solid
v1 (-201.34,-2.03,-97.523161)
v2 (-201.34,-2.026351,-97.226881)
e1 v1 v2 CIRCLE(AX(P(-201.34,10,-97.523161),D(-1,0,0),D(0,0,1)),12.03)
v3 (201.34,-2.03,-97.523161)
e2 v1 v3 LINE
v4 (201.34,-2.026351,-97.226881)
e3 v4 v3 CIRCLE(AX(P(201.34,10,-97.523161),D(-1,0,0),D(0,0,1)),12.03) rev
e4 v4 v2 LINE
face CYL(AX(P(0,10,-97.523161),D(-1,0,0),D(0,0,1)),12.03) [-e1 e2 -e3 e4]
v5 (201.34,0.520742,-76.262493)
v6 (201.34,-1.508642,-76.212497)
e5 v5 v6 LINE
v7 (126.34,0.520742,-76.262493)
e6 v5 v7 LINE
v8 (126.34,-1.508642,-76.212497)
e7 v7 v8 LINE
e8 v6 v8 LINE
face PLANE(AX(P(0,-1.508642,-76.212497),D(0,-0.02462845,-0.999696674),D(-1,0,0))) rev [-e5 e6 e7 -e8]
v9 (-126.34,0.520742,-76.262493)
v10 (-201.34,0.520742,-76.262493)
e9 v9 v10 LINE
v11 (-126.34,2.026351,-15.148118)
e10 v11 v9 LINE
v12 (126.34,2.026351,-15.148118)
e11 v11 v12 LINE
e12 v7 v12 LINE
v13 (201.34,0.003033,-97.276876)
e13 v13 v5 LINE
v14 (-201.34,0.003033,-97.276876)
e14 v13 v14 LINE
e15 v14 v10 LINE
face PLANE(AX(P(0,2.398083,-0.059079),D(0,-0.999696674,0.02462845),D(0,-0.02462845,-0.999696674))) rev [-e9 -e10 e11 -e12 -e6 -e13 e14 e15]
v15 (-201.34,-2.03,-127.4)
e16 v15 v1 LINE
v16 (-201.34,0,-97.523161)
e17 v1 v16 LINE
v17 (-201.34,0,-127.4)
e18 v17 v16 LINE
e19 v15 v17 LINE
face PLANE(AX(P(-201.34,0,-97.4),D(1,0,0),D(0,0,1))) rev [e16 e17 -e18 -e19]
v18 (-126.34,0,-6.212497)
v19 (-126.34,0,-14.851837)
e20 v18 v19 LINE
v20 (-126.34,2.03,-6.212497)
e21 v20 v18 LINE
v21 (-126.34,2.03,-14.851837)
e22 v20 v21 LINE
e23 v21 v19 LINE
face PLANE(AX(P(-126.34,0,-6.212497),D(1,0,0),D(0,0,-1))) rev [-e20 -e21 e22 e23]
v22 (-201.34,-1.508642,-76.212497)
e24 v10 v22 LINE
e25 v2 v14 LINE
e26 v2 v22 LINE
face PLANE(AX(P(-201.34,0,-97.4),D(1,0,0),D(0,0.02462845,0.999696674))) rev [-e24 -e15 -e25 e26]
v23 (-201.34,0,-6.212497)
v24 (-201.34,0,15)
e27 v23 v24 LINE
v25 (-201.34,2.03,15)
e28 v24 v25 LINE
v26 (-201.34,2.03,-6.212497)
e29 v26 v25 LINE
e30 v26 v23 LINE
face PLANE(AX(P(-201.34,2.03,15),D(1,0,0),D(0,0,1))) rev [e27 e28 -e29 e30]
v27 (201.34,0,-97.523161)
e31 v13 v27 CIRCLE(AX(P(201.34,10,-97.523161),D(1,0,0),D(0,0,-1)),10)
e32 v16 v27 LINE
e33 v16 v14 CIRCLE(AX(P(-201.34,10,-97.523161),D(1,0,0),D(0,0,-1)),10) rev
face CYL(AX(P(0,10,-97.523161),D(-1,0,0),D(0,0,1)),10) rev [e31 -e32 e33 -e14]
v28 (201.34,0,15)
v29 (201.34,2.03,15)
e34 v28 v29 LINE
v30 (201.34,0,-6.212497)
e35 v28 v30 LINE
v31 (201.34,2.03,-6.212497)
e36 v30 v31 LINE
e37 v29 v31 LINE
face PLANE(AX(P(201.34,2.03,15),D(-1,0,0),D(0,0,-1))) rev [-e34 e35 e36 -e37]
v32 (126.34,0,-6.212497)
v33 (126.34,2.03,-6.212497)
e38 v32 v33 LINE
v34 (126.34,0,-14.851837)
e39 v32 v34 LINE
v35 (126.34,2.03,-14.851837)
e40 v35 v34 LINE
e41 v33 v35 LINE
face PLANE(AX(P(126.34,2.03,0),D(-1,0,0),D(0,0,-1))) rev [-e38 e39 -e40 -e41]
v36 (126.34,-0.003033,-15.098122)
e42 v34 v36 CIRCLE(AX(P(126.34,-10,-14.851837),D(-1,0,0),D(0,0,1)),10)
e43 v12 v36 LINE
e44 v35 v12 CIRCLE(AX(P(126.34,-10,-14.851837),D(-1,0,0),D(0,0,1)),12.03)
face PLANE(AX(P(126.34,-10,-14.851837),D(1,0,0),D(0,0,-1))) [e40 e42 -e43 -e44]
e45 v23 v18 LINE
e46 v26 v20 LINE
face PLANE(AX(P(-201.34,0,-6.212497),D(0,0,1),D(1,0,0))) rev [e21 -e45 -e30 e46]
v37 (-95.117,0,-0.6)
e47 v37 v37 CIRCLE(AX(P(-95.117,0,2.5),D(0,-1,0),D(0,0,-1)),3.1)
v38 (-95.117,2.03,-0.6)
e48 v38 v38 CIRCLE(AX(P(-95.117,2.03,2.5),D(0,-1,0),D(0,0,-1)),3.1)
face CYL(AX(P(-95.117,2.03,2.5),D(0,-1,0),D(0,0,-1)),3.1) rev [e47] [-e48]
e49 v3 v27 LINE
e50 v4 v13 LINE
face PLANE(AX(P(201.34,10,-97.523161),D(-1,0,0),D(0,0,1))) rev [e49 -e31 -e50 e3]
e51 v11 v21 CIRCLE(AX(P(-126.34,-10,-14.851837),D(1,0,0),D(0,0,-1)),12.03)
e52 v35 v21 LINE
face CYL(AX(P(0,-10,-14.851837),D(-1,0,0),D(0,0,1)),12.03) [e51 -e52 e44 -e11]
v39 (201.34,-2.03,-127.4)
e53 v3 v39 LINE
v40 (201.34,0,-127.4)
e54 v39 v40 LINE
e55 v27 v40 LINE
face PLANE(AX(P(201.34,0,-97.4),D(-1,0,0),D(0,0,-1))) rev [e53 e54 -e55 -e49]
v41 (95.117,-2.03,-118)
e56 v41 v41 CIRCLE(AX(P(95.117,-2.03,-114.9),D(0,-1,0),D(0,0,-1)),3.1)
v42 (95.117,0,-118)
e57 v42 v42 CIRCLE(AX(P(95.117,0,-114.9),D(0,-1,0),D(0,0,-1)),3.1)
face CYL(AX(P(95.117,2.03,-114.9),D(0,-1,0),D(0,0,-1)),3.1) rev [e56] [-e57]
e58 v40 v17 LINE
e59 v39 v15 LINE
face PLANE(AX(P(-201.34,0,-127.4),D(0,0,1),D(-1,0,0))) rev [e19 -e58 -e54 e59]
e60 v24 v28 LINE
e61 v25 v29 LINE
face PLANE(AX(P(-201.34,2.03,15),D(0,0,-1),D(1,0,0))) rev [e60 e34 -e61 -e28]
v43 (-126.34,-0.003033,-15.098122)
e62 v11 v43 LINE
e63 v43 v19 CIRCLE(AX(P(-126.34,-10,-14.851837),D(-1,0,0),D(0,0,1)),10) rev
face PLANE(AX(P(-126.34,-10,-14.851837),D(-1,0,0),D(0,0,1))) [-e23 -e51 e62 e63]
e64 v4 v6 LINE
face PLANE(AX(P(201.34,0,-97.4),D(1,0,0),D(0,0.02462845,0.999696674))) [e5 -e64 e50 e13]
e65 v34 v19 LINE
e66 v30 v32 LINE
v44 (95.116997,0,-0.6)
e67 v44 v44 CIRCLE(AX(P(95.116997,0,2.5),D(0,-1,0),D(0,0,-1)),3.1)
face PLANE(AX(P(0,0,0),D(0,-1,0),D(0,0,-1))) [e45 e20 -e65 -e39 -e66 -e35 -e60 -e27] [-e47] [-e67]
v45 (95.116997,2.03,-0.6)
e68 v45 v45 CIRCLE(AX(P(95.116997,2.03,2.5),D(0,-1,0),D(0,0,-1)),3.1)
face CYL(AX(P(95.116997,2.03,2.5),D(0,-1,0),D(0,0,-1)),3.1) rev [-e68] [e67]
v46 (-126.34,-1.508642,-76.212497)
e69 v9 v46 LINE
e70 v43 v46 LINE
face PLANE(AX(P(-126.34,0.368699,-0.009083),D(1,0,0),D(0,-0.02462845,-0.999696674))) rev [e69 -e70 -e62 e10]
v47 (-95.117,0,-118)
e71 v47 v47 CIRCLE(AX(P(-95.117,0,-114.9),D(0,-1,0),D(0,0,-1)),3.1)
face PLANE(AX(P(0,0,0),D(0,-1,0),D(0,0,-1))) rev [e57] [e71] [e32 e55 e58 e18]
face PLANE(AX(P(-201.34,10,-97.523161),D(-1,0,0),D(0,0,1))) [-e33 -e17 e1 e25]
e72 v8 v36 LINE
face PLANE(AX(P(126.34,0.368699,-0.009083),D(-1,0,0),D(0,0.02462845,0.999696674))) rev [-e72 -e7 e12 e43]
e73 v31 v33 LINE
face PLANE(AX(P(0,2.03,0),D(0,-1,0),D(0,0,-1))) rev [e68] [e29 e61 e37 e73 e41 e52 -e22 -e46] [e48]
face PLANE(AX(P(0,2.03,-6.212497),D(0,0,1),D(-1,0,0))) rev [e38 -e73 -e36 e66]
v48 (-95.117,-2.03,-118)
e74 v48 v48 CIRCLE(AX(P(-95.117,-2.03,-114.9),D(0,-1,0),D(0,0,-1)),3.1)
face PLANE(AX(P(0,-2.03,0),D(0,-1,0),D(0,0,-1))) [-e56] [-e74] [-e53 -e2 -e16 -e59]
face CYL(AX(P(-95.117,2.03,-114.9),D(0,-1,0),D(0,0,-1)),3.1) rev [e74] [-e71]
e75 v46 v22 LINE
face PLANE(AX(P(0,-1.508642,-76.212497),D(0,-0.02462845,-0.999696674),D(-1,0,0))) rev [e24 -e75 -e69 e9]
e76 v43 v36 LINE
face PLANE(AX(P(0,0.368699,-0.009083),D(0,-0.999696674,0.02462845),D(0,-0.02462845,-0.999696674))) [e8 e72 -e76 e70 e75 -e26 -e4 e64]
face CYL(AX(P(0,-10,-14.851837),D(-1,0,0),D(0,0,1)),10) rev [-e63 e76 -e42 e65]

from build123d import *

# Parameters (mm, degrees)
SKETCH1_W               = 402.68
SKETCH1_H               = 30
BOSS_EXTRUDE1_DEPTH     = 2.03
SKETCH2_W               = 402.68
SKETCH2_H               = 30
BOSS_EXTRUDE2_DEPTH     = 2.03
CONVERT_SOLID1_START    = -201.34
CONVERT_SOLID1_DEPTH    = 402.68
CONVERT_SOLID1_2_DEPTH  = 402.68
CUT_EXTRUDE1_START      = -201.34
CUT_EXTRUDE1_DEPTH      = 75
CUT_EXTRUDE1_START_2    = 126.34
CUT_EXTRUDE1_2_DEPTH    = 75
CUT_EXTRUDE2_DEPTH      = 239.296116766
CUT_EXTRUDE2_DEPTH_BACK = 239.296116766
SKETCH8_R               = 3.1
CUT_EXTRUDE3_DEPTH      = 239.27017557
CUT_EXTRUDE3_DEPTH_BACK = 239.27017557
SKETCH10_R              = 3.1


# Read off the part's stored shape, not the designer's step: Convert-Solid1, Cut-Extrude1
with BuildPart() as part:
    # Sketch1 → Boss-Extrude1 (new body)
    with BuildSketch(Plane(origin=(0, 0, 0), x_dir=(1, 0, 0), z_dir=(0, 1, 0))):
        Rectangle(SKETCH1_W, SKETCH1_H)
    extrude(amount=BOSS_EXTRUDE1_DEPTH)


with BuildPart() as body_2:
    # Sketch2 → Boss-Extrude2 (new body)
    with BuildSketch(Plane(origin=(0, 0, 0), x_dir=(1, 0, 0), z_dir=(0, 1, 0))):
        with Locations((0, 112.4)):
            Rectangle(SKETCH2_W, SKETCH2_H)
    extrude(amount=-BOSS_EXTRUDE2_DEPTH)


    add(part.part)  # loft1 joins it to this body
    # loft from a face of the part (loft1)
    loft([body_2.faces().sort_by_distance((0, -1.015, -97.4))[0], body_2.faces().sort_by_distance((0, 1.015, -15))[0]])

    # Convert-Solid1 outline → Convert-Solid1 (cut)
    with BuildSketch(Plane.YZ.offset(CONVERT_SOLID1_START)):
        with BuildLine():
            ThreePointArc((2.03, -14.851837405), (2.029087712, -14.999988764), (2.026350985, -15.148117654))
            Line((2.026350985, -15.148117654), (2.03, -15))
            Line((2.03, -15), (2.03, -14.851837405))
        make_face()
        with BuildLine():
            ThreePointArc((-2.03, -97.523160927), (-2.029683266, -97.435865309), (-2.02873308, -97.348574287))
            Line((-2.02873308, -97.348574287), (-2.03, -97.4))
            Line((-2.03, -97.4), (-2.03, -97.523160927))
        make_face()
    extrude(amount=CONVERT_SOLID1_DEPTH, mode=Mode.SUBTRACT)

    # Convert-Solid1 2 outline → Convert-Solid1 2 (add)
    with BuildSketch(Plane.YZ.offset(CONVERT_SOLID1_START)):
        with BuildLine():
            Line((0, -97.4), (0, -97.523160927))
            ThreePointArc((0, -97.523160927), (0.000758344, -97.40000934), (0.003033263, -97.276876431))
            Line((0.003033263, -97.276876431), (0, -97.4))
        make_face()
        with BuildLine():
            ThreePointArc((0, -14.851837405), (-0.000758344, -14.974988992), (-0.003033263, -15.098121901))
            Line((-0.003033263, -15.098121901), (-2.026350985, -97.226880678))
            ThreePointArc((-2.026350985, -97.226880678), (-2.027695942, -97.28772447), (-2.02873308, -97.348574287))
            Line((-2.02873308, -97.348574287), (0, -15))
            Line((0, -15), (0, -14.851837405))
        make_face()
    extrude(amount=CONVERT_SOLID1_2_DEPTH)

    # Cut-Extrude1 outline → Cut-Extrude1 (cut)
    with BuildSketch(Plane.YZ.offset(CUT_EXTRUDE1_START)):
        with BuildLine():
            Line((-0.003033263, -15.098121901), (-1.508642262, -76.212497042))
            Line((-1.508642262, -76.212497042), (0.520741986, -76.262492795))
            Line((0.520741986, -76.262492795), (2.026350985, -15.148117654))
            ThreePointArc((2.026350985, -15.148117654), (2.029087712, -14.999988764), (2.03, -14.851837405))
            Line((2.03, -14.851837405), (2.03, -6.212497042))
            Line((2.03, -6.212497042), (0, -6.212497042))
            Line((0, -6.212497042), (0, -14.851837405))
            ThreePointArc((0, -14.851837405), (-0.000758344, -14.974988992), (-0.003033263, -15.098121901))
        make_face()
    extrude(amount=CUT_EXTRUDE1_DEPTH, mode=Mode.SUBTRACT)

    # Cut-Extrude1 2 outline → Cut-Extrude1 2 (cut)
    with BuildSketch(Plane.YZ.offset(CUT_EXTRUDE1_START_2)):
        with BuildLine():
            Line((-0.003033263, -15.098121901), (-1.508642262, -76.212497042))
            Line((-1.508642262, -76.212497042), (0.520741986, -76.262492795))
            Line((0.520741986, -76.262492795), (2.026350985, -15.148117654))
            ThreePointArc((2.026350985, -15.148117654), (2.029087712, -14.999988764), (2.03, -14.851837405))
            Line((2.03, -14.851837405), (2.03, -6.212497042))
            Line((2.03, -6.212497042), (0, -6.212497042))
            Line((0, -6.212497042), (0, -14.851837405))
            ThreePointArc((0, -14.851837405), (-0.000758344, -14.974988992), (-0.003033263, -15.098121901))
        make_face()
    extrude(amount=CUT_EXTRUDE1_2_DEPTH, mode=Mode.SUBTRACT)

    # Sketch8 → Cut-Extrude2 (cut, two sides: drawn at the far end of the back side and taken through both)
    with BuildSketch(Plane.XZ.offset(2.03).offset(-CUT_EXTRUDE2_DEPTH_BACK)):
        with Locations(Location((95.117, -114.9, 0), (0, 0, 270))):
            Circle(SKETCH8_R)
        with Locations(Location((-95.117, -114.9, 0), (0, 0, 270))):
            Circle(SKETCH8_R)
    extrude(amount=CUT_EXTRUDE2_DEPTH + CUT_EXTRUDE2_DEPTH_BACK, mode=Mode.SUBTRACT)

    # Sketch10 → Cut-Extrude3 (cut, two sides: drawn at the far end of the back side and taken through both)
    with BuildSketch(Plane.XZ.offset(-CUT_EXTRUDE3_DEPTH_BACK)):
        with Locations(Location((95.116996944, 2.5, 0), (0, 0, 270))):
            Circle(SKETCH10_R)
        with Locations(Location((-95.117, 2.5, 0), (0, 0, 270))):
            Circle(SKETCH10_R)
    extrude(amount=CUT_EXTRUDE3_DEPTH + CUT_EXTRUDE3_DEPTH_BACK, mode=Mode.SUBTRACT)


solid = body_2.part
